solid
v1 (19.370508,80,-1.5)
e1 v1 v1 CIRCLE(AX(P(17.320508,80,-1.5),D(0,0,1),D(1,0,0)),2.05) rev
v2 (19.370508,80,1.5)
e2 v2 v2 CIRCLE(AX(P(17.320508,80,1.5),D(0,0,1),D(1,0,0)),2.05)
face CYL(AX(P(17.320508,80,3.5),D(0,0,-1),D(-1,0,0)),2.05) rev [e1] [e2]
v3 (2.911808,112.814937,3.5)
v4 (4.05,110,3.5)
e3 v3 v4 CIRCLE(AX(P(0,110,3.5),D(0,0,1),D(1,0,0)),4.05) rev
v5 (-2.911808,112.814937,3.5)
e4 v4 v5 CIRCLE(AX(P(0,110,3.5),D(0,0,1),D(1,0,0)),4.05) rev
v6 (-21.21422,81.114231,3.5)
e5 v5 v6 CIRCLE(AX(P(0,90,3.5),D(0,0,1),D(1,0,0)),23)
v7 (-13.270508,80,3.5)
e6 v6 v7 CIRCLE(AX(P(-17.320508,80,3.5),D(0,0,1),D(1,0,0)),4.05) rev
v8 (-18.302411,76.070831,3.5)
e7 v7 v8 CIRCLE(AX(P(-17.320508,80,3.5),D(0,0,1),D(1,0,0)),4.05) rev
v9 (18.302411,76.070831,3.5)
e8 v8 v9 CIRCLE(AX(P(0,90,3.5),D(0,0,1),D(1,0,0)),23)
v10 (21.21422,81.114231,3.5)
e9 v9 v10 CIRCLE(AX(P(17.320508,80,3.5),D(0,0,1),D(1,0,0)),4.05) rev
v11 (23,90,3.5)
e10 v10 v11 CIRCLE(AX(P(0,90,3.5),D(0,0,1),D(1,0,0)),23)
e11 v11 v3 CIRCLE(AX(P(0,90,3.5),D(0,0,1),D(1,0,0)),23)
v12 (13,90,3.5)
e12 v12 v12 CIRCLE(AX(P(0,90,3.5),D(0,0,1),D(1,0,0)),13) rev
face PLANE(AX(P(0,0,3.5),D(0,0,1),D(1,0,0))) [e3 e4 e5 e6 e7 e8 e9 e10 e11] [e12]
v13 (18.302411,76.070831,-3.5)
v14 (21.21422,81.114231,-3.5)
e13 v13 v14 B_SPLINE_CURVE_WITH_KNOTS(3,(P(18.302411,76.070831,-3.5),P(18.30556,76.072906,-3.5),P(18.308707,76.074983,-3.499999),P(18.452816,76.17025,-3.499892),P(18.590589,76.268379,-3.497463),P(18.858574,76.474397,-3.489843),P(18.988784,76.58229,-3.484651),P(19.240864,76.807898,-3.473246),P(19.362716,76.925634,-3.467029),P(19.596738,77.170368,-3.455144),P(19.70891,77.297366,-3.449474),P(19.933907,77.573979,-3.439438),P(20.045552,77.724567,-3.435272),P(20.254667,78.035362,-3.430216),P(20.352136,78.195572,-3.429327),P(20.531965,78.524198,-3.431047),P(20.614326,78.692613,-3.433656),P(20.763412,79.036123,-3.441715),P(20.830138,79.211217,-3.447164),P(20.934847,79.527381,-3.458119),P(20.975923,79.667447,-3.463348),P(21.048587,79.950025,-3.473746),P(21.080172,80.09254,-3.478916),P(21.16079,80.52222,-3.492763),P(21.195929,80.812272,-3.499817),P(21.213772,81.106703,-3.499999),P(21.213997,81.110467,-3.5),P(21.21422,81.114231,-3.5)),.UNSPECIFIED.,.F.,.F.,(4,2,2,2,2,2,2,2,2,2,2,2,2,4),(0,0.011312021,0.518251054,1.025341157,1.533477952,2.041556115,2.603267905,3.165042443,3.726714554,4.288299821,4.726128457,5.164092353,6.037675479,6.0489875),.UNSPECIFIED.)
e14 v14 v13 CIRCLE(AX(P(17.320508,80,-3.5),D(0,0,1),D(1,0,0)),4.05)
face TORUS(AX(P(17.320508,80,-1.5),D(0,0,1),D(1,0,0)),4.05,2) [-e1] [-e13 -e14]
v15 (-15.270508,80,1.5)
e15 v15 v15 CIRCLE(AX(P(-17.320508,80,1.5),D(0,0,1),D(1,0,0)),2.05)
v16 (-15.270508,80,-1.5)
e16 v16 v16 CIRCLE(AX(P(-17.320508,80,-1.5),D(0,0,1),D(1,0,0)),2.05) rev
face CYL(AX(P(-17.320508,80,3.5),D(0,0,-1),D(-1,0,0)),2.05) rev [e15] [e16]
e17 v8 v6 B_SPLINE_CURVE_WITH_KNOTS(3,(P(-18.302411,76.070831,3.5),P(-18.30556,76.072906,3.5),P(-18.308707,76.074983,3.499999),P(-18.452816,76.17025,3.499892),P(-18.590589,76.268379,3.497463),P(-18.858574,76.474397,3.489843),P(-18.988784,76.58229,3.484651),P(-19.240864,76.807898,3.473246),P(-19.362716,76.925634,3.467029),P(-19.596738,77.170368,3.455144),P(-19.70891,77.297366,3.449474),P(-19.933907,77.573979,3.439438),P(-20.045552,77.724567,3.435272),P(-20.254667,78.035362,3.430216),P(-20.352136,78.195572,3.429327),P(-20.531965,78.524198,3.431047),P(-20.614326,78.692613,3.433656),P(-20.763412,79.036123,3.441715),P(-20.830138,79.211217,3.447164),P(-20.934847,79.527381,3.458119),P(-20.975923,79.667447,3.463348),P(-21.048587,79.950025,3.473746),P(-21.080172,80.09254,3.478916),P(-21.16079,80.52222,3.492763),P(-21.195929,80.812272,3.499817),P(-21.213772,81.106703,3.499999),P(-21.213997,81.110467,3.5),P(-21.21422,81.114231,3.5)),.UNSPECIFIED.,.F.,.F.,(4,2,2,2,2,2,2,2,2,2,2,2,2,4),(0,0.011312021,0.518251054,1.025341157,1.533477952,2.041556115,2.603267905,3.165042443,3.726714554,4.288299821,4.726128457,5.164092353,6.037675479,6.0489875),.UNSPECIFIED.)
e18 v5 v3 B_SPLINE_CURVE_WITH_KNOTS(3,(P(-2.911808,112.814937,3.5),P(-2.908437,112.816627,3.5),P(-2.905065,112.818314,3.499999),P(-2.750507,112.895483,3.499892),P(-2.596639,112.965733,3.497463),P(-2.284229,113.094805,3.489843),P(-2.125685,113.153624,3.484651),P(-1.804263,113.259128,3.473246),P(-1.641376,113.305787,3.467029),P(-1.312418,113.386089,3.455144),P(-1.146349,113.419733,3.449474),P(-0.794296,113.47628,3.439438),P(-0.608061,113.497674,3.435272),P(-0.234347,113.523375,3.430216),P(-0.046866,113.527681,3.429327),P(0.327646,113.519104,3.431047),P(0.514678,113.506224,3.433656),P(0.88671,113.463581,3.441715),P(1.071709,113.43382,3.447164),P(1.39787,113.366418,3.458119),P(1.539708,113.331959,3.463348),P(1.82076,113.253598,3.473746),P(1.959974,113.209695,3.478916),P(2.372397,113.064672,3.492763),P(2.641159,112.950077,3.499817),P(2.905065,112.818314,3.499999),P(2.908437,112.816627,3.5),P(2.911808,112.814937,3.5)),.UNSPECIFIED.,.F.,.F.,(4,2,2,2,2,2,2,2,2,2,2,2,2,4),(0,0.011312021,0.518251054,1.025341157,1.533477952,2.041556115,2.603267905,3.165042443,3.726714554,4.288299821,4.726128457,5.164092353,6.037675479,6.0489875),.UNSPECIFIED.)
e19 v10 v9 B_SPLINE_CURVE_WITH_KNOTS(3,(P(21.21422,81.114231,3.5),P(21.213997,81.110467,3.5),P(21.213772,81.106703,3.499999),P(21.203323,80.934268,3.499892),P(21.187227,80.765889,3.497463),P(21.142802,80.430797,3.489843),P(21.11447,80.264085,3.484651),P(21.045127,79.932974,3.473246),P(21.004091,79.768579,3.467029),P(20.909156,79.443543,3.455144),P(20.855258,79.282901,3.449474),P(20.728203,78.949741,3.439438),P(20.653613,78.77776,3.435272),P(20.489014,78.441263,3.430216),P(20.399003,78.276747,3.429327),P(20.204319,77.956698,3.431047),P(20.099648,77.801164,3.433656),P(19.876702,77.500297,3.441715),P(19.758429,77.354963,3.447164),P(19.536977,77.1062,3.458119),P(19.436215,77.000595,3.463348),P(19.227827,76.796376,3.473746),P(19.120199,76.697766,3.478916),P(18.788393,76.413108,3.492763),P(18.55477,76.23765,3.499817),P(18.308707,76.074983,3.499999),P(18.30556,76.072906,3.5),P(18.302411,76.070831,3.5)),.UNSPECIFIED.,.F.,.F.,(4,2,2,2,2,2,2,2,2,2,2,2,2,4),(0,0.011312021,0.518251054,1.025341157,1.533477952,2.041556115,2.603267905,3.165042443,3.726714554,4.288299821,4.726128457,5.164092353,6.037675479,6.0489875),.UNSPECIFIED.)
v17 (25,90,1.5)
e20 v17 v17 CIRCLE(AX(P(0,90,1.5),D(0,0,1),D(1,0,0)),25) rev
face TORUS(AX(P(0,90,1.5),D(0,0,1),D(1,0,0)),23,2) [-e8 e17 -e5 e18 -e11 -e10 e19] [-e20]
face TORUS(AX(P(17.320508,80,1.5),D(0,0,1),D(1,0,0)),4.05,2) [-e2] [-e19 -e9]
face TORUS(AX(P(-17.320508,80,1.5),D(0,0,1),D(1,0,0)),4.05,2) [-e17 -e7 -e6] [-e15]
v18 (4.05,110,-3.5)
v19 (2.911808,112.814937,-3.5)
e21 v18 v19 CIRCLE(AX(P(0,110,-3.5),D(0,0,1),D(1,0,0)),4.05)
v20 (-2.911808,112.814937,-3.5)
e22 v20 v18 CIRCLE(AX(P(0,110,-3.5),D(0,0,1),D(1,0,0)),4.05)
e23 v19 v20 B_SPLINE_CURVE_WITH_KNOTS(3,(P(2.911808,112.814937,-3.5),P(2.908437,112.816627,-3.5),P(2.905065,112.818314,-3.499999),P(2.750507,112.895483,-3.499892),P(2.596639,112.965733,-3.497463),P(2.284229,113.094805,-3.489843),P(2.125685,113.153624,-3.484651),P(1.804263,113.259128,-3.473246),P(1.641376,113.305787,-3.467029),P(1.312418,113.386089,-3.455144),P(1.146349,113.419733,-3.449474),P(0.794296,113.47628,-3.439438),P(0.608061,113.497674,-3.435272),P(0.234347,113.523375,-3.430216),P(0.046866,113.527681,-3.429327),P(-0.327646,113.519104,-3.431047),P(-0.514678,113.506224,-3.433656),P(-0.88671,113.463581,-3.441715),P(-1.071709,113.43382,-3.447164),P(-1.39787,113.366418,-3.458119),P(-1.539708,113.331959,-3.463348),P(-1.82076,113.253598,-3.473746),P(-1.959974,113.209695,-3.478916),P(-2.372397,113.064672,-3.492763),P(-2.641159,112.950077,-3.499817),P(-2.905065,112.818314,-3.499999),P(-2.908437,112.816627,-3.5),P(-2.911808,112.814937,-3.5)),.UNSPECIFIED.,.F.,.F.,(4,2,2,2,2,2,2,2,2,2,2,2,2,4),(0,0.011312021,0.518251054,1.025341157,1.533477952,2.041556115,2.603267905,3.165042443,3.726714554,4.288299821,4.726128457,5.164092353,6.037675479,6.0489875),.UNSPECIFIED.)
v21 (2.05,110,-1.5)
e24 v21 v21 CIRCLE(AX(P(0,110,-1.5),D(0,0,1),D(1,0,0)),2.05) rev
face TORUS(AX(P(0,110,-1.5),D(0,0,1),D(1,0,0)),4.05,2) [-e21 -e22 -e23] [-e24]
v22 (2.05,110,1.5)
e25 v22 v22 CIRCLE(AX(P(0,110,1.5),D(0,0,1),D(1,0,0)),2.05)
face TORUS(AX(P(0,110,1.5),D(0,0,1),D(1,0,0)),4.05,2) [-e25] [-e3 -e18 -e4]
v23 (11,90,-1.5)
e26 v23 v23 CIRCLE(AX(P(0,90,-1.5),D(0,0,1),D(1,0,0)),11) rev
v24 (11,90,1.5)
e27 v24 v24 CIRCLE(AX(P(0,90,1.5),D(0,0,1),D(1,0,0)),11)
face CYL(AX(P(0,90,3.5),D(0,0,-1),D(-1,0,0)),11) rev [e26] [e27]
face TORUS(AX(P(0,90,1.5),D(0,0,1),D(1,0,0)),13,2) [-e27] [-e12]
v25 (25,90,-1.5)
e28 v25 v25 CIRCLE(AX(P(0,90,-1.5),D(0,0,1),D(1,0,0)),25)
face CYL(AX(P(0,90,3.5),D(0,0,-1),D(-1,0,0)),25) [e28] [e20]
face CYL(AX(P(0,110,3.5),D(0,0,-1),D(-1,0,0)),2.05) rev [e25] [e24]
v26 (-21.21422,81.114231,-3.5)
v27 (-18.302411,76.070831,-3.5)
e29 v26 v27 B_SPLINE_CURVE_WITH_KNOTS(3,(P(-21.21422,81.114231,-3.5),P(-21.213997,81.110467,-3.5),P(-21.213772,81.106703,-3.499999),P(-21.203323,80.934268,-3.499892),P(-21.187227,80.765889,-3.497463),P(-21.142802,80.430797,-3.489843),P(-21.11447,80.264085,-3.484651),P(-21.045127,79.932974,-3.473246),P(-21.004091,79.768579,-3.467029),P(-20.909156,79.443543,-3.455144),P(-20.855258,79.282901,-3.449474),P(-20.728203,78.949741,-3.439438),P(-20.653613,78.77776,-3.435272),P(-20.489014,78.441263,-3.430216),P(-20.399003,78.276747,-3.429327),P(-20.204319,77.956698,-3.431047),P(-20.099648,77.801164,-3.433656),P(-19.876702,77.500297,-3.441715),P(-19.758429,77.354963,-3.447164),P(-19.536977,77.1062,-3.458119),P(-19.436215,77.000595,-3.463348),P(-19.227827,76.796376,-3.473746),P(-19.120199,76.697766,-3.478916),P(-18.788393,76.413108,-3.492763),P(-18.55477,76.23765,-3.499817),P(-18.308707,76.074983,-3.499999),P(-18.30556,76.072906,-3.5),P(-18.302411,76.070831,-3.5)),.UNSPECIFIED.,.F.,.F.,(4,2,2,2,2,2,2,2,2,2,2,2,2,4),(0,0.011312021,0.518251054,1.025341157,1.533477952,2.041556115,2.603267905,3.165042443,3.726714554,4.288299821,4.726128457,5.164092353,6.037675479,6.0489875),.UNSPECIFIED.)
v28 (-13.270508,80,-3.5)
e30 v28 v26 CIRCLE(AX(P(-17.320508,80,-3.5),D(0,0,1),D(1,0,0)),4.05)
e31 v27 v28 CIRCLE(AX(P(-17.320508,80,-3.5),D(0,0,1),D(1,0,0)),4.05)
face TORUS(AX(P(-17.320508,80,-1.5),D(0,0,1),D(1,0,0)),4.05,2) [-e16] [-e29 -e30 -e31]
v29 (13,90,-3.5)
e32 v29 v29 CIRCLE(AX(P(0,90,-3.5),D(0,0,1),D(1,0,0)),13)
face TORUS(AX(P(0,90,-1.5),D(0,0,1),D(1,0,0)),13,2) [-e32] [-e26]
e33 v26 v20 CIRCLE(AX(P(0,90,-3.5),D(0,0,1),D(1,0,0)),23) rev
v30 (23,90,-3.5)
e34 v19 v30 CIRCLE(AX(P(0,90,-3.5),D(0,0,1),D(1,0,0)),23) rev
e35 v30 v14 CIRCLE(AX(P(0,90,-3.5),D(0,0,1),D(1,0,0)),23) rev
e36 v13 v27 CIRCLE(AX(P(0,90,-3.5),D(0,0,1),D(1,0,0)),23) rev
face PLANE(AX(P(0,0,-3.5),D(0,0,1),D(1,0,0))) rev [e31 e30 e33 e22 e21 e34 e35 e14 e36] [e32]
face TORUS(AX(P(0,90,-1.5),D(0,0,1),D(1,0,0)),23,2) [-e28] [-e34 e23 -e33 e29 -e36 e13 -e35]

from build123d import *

# Parameters (mm, degrees)
SKETCH_1_R      = 25
SKETCH_1_R_2    = 11
SKETCH_1_R_3    = 2.05
EXTRUDE_1_DEPTH = 3.5
FILLET_1_R      = 2


with BuildPart() as part:
    # 草图1 → 凸台-拉伸1 (new, symmetric)
    with BuildSketch(Plane.XY):
        with Locations((0, 90)):
            Circle(SKETCH_1_R)
        with Locations((0, 90)):
            Circle(SKETCH_1_R_2, mode=Mode.SUBTRACT)
        with Locations((0, 110)):
            Circle(SKETCH_1_R_3, mode=Mode.SUBTRACT)
        with Locations((17.320508076, 80)):
            Circle(SKETCH_1_R_3, mode=Mode.SUBTRACT)
        with Locations((-17.320508076, 80)):
            Circle(SKETCH_1_R_3, mode=Mode.SUBTRACT)
    extrude(amount=EXTRUDE_1_DEPTH, both=True)

    # 圆角1
    # the kernel refuses this fillet: 2 mm, written as the material it takes off along each edge
    with BuildSketch(Plane(origin=(-17.320508076, 80, 3.5), x_dir=(1, 0, 0), z_dir=(0, -1, 0))) as fillet_1_piece_1:
        with BuildLine():
            CenterArc((2.05 + FILLET_1_R, -FILLET_1_R), FILLET_1_R, 90, 90)
            Line((2.05, -FILLET_1_R), (2.05, 0))
            Line((2.05, 0), (2.05 + FILLET_1_R, 0))
        make_face()
    revolve(axis=Axis((-17.320508076, 80, 3.5), (0, 0, 1)), mode=Mode.SUBTRACT)
    with BuildSketch(Plane(origin=(17.320508076, 80, 3.5), x_dir=(1, 0, 0), z_dir=(0, -1, 0))) as fillet_1_piece_2:
        with BuildLine():
            CenterArc((2.05 + FILLET_1_R, -FILLET_1_R), FILLET_1_R, 90, 90)
            Line((2.05, -FILLET_1_R), (2.05, 0))
            Line((2.05, 0), (2.05 + FILLET_1_R, 0))
        make_face()
    revolve(axis=Axis((17.320508076, 80, 3.5), (0, 0, 1)), mode=Mode.SUBTRACT)
    with BuildSketch(Plane(origin=(0, 110, 3.5), x_dir=(1, 0, 0), z_dir=(0, -1, 0))) as fillet_1_piece_3:
        with BuildLine():
            CenterArc((2.05 + FILLET_1_R, -FILLET_1_R), FILLET_1_R, 90, 90)
            Line((2.05, -FILLET_1_R), (2.05, 0))
            Line((2.05, 0), (2.05 + FILLET_1_R, 0))
        make_face()
    revolve(axis=Axis((0, 110, 3.5), (0, 0, 1)), mode=Mode.SUBTRACT)
    with BuildSketch(Plane(origin=(0, 90, 3.5), x_dir=(1, 0, 0), z_dir=(0, -1, 0))) as fillet_1_piece_4:
        with BuildLine():
            CenterArc((25 - FILLET_1_R, -FILLET_1_R), FILLET_1_R, 0, 90)
            Line((25 - FILLET_1_R, 0), (25, 0))
            Line((25, 0), (25, -FILLET_1_R))
        make_face()
    revolve(axis=Axis((0, 90, 3.5), (0, 0, 1)), mode=Mode.SUBTRACT)
    with BuildSketch(Plane(origin=(0, 90, -3.5), x_dir=(1, 0, 0), z_dir=(0, -1, 0))) as fillet_1_piece_5:
        with BuildLine():
            CenterArc((25 - FILLET_1_R, FILLET_1_R), FILLET_1_R, 270, 90)
            Line((25 - FILLET_1_R, 0), (25, 0))
            Line((25, 0), (25, FILLET_1_R))
        make_face()
    revolve(axis=Axis((0, 90, -3.5), (0, 0, 1)), mode=Mode.SUBTRACT)
    with BuildSketch(Plane(origin=(0, 110, -3.5), x_dir=(1, 0, 0), z_dir=(0, -1, 0))) as fillet_1_piece_6:
        with BuildLine():
            CenterArc((2.05 + FILLET_1_R, FILLET_1_R), FILLET_1_R, 180, 90)
            Line((2.05 + FILLET_1_R, 0), (2.05, 0))
            Line((2.05, 0), (2.05, FILLET_1_R))
        make_face()
    revolve(axis=Axis((0, 110, -3.5), (0, 0, 1)), mode=Mode.SUBTRACT)
    with BuildSketch(Plane(origin=(17.320508076, 80, -3.5), x_dir=(1, 0, 0), z_dir=(0, -1, 0))) as fillet_1_piece_7:
        with BuildLine():
            CenterArc((2.05 + FILLET_1_R, FILLET_1_R), FILLET_1_R, 180, 90)
            Line((2.05 + FILLET_1_R, 0), (2.05, 0))
            Line((2.05, 0), (2.05, FILLET_1_R))
        make_face()
    revolve(axis=Axis((17.320508076, 80, -3.5), (0, 0, 1)), mode=Mode.SUBTRACT)
    with BuildSketch(Plane(origin=(-17.320508076, 80, -3.5), x_dir=(1, 0, 0), z_dir=(0, -1, 0))) as fillet_1_piece_8:
        with BuildLine():
            CenterArc((2.05 + FILLET_1_R, FILLET_1_R), FILLET_1_R, 180, 90)
            Line((2.05 + FILLET_1_R, 0), (2.05, 0))
            Line((2.05, 0), (2.05, FILLET_1_R))
        make_face()
    revolve(axis=Axis((-17.320508076, 80, -3.5), (0, 0, 1)), mode=Mode.SUBTRACT)
    with BuildSketch(Plane(origin=(0, 90, -3.5), x_dir=(1, 0, 0), z_dir=(0, -1, 0))) as fillet_1_piece_9:
        with BuildLine():
            CenterArc((11 + FILLET_1_R, FILLET_1_R), FILLET_1_R, 180, 90)
            Line((11 + FILLET_1_R, 0), (11, 0))
            Line((11, 0), (11, FILLET_1_R))
        make_face()
    revolve(axis=Axis((0, 90, -3.5), (0, 0, 1)), mode=Mode.SUBTRACT)
    with BuildSketch(Plane(origin=(0, 90, 3.5), x_dir=(1, 0, 0), z_dir=(0, -1, 0))) as fillet_1_piece_10:
        with BuildLine():
            CenterArc((11 + FILLET_1_R, -FILLET_1_R), FILLET_1_R, 90, 90)
            Line((11, -FILLET_1_R), (11, 0))
            Line((11, 0), (11 + FILLET_1_R, 0))
        make_face()
    revolve(axis=Axis((0, 90, 3.5), (0, 0, 1)), mode=Mode.SUBTRACT)


solid = part.part
